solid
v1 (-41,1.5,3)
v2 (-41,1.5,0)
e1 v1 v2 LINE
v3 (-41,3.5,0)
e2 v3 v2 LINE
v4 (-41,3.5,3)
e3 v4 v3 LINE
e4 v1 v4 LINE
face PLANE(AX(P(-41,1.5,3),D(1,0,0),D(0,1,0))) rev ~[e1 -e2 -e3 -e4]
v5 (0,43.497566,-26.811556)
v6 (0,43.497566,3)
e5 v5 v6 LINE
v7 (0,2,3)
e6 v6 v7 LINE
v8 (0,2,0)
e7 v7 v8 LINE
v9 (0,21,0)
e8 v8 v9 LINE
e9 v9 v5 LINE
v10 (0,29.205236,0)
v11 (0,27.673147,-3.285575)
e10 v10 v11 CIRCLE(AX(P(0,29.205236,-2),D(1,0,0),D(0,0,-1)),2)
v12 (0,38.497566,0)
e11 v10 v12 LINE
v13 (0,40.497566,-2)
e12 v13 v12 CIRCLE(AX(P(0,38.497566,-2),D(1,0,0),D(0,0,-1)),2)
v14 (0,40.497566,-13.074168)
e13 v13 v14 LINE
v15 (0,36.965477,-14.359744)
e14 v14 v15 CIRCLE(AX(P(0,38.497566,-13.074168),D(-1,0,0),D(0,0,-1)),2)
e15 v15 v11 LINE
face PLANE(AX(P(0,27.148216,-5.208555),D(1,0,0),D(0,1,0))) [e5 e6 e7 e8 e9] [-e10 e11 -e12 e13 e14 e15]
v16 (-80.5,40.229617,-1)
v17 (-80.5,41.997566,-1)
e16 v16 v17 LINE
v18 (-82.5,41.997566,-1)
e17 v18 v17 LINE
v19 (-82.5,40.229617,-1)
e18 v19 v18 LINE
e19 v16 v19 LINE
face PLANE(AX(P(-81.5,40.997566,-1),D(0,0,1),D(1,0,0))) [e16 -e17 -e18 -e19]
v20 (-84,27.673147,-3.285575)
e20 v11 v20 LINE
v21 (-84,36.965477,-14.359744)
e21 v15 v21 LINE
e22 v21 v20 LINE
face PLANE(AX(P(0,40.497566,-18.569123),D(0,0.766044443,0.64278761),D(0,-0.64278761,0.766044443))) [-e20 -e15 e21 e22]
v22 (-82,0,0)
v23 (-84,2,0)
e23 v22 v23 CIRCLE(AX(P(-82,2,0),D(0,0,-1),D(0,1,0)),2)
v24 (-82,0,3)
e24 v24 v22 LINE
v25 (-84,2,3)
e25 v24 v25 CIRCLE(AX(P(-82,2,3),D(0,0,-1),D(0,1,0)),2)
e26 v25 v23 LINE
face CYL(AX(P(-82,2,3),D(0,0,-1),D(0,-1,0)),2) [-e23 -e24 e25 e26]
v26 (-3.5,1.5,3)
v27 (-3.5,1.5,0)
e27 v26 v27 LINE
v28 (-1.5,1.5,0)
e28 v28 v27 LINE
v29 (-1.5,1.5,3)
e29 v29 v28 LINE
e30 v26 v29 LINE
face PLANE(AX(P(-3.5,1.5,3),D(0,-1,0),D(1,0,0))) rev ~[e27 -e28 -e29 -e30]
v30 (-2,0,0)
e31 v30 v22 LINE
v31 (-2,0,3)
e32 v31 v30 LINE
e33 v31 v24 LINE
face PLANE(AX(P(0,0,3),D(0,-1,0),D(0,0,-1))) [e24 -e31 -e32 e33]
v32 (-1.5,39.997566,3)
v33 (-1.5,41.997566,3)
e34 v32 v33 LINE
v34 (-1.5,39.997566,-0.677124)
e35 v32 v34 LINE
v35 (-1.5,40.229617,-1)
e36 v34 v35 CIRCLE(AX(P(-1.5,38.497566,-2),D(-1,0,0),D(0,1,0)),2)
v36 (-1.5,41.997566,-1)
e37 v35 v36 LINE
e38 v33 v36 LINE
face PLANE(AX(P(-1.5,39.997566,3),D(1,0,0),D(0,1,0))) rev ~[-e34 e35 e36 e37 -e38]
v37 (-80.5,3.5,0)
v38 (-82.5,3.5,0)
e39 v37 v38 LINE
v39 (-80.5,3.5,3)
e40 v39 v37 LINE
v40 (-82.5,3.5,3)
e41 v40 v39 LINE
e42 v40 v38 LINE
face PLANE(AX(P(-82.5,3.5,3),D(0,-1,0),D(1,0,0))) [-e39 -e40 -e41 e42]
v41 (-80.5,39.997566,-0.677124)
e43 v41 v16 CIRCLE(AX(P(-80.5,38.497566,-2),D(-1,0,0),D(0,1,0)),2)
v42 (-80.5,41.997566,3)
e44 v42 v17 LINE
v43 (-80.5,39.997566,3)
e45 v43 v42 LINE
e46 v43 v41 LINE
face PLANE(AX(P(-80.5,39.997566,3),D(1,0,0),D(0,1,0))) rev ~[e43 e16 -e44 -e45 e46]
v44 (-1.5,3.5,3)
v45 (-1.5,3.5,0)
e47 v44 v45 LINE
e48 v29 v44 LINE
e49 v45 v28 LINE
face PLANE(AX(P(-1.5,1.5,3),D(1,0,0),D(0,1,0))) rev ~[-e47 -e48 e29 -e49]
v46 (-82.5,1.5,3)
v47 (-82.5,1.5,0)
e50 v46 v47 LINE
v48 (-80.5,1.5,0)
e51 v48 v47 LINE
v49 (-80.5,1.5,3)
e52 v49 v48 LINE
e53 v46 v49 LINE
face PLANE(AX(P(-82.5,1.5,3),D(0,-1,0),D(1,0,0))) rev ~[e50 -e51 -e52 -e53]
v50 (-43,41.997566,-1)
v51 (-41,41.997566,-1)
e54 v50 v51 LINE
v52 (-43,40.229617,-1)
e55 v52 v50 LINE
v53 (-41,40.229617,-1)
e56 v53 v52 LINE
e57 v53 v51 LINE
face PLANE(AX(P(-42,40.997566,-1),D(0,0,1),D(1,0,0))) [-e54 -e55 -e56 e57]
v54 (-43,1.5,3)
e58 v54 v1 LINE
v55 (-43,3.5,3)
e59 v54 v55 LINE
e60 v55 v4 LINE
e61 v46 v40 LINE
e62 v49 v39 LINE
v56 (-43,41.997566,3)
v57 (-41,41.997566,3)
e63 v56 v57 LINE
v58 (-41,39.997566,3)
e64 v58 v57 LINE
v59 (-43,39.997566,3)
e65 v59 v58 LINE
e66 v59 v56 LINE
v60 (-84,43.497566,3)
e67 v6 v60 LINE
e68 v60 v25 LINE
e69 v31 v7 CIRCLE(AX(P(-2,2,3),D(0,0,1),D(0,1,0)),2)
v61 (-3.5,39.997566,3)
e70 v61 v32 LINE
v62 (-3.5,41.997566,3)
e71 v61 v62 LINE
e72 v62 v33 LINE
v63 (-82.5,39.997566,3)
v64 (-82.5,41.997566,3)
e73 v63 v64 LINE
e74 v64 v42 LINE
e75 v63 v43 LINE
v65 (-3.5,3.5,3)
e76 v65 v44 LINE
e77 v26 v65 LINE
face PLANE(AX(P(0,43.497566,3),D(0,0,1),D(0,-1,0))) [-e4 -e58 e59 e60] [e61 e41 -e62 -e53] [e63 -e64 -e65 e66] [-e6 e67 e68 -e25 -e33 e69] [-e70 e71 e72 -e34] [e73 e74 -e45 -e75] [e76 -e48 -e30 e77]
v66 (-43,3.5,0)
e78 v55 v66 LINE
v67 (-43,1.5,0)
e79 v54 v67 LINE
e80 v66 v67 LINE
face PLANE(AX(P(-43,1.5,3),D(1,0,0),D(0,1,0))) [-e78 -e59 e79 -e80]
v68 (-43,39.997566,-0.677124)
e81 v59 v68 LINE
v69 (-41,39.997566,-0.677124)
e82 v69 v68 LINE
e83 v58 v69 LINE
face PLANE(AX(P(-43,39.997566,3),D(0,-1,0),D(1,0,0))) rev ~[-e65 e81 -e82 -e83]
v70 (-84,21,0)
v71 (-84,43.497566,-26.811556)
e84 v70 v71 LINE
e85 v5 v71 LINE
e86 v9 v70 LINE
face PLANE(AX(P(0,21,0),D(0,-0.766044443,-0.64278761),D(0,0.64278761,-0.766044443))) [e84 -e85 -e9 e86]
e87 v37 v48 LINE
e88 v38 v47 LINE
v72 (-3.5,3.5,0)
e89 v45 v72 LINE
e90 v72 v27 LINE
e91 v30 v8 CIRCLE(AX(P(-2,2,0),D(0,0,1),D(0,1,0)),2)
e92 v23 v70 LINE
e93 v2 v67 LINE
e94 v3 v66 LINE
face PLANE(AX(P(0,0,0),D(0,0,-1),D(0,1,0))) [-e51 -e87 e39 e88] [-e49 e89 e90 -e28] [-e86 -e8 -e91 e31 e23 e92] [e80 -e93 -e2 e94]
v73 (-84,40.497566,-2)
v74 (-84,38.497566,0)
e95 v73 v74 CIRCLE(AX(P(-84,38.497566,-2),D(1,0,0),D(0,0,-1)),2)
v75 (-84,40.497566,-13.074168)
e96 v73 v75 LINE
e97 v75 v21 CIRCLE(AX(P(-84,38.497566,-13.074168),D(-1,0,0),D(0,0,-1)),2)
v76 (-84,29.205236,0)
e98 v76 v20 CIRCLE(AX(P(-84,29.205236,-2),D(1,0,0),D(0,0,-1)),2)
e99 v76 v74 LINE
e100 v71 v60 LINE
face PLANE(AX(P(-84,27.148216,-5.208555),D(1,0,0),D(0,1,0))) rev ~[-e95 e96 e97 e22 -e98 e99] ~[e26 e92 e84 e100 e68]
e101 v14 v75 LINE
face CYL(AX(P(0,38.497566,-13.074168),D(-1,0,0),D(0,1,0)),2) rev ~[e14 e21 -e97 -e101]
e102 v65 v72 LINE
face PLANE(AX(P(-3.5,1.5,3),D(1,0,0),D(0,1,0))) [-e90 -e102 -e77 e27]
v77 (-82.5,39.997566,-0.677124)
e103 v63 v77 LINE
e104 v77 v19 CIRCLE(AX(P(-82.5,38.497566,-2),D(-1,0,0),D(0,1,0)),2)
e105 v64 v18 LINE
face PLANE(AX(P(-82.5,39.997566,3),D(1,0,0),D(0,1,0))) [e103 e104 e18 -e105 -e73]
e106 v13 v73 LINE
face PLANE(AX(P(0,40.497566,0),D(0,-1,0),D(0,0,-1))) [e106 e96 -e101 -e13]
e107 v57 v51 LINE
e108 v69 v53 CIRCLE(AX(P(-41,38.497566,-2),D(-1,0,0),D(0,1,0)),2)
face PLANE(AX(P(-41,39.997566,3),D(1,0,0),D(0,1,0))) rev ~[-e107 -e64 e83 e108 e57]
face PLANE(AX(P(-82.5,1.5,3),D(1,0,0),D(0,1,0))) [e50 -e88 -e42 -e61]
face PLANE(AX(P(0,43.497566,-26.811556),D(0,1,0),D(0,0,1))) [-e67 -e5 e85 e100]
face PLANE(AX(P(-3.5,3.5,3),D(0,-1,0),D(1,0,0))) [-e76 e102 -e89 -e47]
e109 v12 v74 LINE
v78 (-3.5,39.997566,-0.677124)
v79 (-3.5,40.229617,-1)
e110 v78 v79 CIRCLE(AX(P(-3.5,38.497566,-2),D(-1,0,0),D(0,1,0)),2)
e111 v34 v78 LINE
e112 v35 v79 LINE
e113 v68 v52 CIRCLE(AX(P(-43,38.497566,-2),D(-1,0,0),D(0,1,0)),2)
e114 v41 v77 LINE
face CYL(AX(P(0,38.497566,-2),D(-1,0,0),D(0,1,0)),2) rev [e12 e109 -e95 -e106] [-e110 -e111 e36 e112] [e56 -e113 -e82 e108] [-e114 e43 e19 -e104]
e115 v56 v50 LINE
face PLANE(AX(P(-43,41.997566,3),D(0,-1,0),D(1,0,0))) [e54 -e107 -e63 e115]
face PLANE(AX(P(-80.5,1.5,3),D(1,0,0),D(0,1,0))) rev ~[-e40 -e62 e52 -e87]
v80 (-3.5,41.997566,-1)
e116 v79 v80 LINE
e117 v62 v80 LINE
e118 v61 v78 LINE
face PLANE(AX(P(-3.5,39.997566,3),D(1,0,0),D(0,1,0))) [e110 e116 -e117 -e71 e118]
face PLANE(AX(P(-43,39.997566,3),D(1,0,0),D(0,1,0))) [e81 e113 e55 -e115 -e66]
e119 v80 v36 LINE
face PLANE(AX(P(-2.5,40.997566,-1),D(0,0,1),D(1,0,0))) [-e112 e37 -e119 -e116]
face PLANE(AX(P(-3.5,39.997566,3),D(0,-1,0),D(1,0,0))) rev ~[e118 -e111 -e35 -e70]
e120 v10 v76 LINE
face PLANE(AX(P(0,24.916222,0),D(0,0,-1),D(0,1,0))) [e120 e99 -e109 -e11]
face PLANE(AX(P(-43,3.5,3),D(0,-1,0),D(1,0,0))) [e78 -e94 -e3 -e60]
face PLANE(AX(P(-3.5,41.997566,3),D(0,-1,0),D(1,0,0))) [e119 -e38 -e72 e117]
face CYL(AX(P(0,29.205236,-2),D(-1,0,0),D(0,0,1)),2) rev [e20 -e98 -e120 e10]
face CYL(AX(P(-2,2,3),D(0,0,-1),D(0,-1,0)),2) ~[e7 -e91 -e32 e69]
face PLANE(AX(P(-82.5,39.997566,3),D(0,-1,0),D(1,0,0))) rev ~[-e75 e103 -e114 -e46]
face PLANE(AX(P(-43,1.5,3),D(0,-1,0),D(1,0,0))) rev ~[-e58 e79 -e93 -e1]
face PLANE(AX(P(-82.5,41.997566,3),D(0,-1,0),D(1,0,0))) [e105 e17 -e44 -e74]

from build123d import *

# Parameters (mm, degrees)
F1_DEPTH = 84
F2_R     = 2
F3_R     = 2
F4_W     = 2
F4_H     = 2
F5_DEPTH = 4


# Not quite as in the source:
# - a feature names something its author has since deleted; it is built from what else it names


with BuildPart() as f1:
    # F0 (on Right) → F1 (new body)
    with BuildSketch(Plane.YZ):
        Polygon((0, 3), (0, 0), (21, 0), (43.497566339, -26.8115555092), (43.497566339, 3), (21, 3), align=None)
        Polygon((40.497566339, -18.5691232508), (24.916221868, 0), (40.497566339, 0), align=None, mode=Mode.SUBTRACT)
    extrude(amount=-F1_DEPTH)

    # F2
    f2_edges = [f1.edges().sort_by_distance(p)[0] for p in [
        (0, 0, 1.5),
        (-84, 0, 1.5),
    ]]
    fillet(f2_edges, radius=F2_R)

    # F3
    f3_edges = [f1.edges().sort_by_distance(p)[0] for p in [
        (-42, 40.497566, 0),
        (-42, 40.497566, -18.569123),
        (-42, 24.916222, 0),
    ]]
    fillet(f3_edges, radius=F3_R)

    # F4 (on face) → F5 (cut)
    with BuildSketch(Plane.XY.offset(3)):
        with Locations((-42, 40.997566339)):
            Rectangle(F4_W, F4_H)
        with Locations((-2.5, 40.997566339)):
            Rectangle(F4_W, F4_H)
        with Locations((-2.5, 2.5)):
            Rectangle(F4_W, F4_H)
        with Locations((-42, 2.4999999997)):
            Rectangle(F4_W, F4_H)
        with Locations((-81.5, 2.5)):
            Rectangle(F4_W, F4_H)
        with Locations((-81.5, 40.997566339)):
            Rectangle(F4_W, F4_H)
    extrude(amount=-F5_DEPTH, mode=Mode.SUBTRACT)


solid = f1.part
